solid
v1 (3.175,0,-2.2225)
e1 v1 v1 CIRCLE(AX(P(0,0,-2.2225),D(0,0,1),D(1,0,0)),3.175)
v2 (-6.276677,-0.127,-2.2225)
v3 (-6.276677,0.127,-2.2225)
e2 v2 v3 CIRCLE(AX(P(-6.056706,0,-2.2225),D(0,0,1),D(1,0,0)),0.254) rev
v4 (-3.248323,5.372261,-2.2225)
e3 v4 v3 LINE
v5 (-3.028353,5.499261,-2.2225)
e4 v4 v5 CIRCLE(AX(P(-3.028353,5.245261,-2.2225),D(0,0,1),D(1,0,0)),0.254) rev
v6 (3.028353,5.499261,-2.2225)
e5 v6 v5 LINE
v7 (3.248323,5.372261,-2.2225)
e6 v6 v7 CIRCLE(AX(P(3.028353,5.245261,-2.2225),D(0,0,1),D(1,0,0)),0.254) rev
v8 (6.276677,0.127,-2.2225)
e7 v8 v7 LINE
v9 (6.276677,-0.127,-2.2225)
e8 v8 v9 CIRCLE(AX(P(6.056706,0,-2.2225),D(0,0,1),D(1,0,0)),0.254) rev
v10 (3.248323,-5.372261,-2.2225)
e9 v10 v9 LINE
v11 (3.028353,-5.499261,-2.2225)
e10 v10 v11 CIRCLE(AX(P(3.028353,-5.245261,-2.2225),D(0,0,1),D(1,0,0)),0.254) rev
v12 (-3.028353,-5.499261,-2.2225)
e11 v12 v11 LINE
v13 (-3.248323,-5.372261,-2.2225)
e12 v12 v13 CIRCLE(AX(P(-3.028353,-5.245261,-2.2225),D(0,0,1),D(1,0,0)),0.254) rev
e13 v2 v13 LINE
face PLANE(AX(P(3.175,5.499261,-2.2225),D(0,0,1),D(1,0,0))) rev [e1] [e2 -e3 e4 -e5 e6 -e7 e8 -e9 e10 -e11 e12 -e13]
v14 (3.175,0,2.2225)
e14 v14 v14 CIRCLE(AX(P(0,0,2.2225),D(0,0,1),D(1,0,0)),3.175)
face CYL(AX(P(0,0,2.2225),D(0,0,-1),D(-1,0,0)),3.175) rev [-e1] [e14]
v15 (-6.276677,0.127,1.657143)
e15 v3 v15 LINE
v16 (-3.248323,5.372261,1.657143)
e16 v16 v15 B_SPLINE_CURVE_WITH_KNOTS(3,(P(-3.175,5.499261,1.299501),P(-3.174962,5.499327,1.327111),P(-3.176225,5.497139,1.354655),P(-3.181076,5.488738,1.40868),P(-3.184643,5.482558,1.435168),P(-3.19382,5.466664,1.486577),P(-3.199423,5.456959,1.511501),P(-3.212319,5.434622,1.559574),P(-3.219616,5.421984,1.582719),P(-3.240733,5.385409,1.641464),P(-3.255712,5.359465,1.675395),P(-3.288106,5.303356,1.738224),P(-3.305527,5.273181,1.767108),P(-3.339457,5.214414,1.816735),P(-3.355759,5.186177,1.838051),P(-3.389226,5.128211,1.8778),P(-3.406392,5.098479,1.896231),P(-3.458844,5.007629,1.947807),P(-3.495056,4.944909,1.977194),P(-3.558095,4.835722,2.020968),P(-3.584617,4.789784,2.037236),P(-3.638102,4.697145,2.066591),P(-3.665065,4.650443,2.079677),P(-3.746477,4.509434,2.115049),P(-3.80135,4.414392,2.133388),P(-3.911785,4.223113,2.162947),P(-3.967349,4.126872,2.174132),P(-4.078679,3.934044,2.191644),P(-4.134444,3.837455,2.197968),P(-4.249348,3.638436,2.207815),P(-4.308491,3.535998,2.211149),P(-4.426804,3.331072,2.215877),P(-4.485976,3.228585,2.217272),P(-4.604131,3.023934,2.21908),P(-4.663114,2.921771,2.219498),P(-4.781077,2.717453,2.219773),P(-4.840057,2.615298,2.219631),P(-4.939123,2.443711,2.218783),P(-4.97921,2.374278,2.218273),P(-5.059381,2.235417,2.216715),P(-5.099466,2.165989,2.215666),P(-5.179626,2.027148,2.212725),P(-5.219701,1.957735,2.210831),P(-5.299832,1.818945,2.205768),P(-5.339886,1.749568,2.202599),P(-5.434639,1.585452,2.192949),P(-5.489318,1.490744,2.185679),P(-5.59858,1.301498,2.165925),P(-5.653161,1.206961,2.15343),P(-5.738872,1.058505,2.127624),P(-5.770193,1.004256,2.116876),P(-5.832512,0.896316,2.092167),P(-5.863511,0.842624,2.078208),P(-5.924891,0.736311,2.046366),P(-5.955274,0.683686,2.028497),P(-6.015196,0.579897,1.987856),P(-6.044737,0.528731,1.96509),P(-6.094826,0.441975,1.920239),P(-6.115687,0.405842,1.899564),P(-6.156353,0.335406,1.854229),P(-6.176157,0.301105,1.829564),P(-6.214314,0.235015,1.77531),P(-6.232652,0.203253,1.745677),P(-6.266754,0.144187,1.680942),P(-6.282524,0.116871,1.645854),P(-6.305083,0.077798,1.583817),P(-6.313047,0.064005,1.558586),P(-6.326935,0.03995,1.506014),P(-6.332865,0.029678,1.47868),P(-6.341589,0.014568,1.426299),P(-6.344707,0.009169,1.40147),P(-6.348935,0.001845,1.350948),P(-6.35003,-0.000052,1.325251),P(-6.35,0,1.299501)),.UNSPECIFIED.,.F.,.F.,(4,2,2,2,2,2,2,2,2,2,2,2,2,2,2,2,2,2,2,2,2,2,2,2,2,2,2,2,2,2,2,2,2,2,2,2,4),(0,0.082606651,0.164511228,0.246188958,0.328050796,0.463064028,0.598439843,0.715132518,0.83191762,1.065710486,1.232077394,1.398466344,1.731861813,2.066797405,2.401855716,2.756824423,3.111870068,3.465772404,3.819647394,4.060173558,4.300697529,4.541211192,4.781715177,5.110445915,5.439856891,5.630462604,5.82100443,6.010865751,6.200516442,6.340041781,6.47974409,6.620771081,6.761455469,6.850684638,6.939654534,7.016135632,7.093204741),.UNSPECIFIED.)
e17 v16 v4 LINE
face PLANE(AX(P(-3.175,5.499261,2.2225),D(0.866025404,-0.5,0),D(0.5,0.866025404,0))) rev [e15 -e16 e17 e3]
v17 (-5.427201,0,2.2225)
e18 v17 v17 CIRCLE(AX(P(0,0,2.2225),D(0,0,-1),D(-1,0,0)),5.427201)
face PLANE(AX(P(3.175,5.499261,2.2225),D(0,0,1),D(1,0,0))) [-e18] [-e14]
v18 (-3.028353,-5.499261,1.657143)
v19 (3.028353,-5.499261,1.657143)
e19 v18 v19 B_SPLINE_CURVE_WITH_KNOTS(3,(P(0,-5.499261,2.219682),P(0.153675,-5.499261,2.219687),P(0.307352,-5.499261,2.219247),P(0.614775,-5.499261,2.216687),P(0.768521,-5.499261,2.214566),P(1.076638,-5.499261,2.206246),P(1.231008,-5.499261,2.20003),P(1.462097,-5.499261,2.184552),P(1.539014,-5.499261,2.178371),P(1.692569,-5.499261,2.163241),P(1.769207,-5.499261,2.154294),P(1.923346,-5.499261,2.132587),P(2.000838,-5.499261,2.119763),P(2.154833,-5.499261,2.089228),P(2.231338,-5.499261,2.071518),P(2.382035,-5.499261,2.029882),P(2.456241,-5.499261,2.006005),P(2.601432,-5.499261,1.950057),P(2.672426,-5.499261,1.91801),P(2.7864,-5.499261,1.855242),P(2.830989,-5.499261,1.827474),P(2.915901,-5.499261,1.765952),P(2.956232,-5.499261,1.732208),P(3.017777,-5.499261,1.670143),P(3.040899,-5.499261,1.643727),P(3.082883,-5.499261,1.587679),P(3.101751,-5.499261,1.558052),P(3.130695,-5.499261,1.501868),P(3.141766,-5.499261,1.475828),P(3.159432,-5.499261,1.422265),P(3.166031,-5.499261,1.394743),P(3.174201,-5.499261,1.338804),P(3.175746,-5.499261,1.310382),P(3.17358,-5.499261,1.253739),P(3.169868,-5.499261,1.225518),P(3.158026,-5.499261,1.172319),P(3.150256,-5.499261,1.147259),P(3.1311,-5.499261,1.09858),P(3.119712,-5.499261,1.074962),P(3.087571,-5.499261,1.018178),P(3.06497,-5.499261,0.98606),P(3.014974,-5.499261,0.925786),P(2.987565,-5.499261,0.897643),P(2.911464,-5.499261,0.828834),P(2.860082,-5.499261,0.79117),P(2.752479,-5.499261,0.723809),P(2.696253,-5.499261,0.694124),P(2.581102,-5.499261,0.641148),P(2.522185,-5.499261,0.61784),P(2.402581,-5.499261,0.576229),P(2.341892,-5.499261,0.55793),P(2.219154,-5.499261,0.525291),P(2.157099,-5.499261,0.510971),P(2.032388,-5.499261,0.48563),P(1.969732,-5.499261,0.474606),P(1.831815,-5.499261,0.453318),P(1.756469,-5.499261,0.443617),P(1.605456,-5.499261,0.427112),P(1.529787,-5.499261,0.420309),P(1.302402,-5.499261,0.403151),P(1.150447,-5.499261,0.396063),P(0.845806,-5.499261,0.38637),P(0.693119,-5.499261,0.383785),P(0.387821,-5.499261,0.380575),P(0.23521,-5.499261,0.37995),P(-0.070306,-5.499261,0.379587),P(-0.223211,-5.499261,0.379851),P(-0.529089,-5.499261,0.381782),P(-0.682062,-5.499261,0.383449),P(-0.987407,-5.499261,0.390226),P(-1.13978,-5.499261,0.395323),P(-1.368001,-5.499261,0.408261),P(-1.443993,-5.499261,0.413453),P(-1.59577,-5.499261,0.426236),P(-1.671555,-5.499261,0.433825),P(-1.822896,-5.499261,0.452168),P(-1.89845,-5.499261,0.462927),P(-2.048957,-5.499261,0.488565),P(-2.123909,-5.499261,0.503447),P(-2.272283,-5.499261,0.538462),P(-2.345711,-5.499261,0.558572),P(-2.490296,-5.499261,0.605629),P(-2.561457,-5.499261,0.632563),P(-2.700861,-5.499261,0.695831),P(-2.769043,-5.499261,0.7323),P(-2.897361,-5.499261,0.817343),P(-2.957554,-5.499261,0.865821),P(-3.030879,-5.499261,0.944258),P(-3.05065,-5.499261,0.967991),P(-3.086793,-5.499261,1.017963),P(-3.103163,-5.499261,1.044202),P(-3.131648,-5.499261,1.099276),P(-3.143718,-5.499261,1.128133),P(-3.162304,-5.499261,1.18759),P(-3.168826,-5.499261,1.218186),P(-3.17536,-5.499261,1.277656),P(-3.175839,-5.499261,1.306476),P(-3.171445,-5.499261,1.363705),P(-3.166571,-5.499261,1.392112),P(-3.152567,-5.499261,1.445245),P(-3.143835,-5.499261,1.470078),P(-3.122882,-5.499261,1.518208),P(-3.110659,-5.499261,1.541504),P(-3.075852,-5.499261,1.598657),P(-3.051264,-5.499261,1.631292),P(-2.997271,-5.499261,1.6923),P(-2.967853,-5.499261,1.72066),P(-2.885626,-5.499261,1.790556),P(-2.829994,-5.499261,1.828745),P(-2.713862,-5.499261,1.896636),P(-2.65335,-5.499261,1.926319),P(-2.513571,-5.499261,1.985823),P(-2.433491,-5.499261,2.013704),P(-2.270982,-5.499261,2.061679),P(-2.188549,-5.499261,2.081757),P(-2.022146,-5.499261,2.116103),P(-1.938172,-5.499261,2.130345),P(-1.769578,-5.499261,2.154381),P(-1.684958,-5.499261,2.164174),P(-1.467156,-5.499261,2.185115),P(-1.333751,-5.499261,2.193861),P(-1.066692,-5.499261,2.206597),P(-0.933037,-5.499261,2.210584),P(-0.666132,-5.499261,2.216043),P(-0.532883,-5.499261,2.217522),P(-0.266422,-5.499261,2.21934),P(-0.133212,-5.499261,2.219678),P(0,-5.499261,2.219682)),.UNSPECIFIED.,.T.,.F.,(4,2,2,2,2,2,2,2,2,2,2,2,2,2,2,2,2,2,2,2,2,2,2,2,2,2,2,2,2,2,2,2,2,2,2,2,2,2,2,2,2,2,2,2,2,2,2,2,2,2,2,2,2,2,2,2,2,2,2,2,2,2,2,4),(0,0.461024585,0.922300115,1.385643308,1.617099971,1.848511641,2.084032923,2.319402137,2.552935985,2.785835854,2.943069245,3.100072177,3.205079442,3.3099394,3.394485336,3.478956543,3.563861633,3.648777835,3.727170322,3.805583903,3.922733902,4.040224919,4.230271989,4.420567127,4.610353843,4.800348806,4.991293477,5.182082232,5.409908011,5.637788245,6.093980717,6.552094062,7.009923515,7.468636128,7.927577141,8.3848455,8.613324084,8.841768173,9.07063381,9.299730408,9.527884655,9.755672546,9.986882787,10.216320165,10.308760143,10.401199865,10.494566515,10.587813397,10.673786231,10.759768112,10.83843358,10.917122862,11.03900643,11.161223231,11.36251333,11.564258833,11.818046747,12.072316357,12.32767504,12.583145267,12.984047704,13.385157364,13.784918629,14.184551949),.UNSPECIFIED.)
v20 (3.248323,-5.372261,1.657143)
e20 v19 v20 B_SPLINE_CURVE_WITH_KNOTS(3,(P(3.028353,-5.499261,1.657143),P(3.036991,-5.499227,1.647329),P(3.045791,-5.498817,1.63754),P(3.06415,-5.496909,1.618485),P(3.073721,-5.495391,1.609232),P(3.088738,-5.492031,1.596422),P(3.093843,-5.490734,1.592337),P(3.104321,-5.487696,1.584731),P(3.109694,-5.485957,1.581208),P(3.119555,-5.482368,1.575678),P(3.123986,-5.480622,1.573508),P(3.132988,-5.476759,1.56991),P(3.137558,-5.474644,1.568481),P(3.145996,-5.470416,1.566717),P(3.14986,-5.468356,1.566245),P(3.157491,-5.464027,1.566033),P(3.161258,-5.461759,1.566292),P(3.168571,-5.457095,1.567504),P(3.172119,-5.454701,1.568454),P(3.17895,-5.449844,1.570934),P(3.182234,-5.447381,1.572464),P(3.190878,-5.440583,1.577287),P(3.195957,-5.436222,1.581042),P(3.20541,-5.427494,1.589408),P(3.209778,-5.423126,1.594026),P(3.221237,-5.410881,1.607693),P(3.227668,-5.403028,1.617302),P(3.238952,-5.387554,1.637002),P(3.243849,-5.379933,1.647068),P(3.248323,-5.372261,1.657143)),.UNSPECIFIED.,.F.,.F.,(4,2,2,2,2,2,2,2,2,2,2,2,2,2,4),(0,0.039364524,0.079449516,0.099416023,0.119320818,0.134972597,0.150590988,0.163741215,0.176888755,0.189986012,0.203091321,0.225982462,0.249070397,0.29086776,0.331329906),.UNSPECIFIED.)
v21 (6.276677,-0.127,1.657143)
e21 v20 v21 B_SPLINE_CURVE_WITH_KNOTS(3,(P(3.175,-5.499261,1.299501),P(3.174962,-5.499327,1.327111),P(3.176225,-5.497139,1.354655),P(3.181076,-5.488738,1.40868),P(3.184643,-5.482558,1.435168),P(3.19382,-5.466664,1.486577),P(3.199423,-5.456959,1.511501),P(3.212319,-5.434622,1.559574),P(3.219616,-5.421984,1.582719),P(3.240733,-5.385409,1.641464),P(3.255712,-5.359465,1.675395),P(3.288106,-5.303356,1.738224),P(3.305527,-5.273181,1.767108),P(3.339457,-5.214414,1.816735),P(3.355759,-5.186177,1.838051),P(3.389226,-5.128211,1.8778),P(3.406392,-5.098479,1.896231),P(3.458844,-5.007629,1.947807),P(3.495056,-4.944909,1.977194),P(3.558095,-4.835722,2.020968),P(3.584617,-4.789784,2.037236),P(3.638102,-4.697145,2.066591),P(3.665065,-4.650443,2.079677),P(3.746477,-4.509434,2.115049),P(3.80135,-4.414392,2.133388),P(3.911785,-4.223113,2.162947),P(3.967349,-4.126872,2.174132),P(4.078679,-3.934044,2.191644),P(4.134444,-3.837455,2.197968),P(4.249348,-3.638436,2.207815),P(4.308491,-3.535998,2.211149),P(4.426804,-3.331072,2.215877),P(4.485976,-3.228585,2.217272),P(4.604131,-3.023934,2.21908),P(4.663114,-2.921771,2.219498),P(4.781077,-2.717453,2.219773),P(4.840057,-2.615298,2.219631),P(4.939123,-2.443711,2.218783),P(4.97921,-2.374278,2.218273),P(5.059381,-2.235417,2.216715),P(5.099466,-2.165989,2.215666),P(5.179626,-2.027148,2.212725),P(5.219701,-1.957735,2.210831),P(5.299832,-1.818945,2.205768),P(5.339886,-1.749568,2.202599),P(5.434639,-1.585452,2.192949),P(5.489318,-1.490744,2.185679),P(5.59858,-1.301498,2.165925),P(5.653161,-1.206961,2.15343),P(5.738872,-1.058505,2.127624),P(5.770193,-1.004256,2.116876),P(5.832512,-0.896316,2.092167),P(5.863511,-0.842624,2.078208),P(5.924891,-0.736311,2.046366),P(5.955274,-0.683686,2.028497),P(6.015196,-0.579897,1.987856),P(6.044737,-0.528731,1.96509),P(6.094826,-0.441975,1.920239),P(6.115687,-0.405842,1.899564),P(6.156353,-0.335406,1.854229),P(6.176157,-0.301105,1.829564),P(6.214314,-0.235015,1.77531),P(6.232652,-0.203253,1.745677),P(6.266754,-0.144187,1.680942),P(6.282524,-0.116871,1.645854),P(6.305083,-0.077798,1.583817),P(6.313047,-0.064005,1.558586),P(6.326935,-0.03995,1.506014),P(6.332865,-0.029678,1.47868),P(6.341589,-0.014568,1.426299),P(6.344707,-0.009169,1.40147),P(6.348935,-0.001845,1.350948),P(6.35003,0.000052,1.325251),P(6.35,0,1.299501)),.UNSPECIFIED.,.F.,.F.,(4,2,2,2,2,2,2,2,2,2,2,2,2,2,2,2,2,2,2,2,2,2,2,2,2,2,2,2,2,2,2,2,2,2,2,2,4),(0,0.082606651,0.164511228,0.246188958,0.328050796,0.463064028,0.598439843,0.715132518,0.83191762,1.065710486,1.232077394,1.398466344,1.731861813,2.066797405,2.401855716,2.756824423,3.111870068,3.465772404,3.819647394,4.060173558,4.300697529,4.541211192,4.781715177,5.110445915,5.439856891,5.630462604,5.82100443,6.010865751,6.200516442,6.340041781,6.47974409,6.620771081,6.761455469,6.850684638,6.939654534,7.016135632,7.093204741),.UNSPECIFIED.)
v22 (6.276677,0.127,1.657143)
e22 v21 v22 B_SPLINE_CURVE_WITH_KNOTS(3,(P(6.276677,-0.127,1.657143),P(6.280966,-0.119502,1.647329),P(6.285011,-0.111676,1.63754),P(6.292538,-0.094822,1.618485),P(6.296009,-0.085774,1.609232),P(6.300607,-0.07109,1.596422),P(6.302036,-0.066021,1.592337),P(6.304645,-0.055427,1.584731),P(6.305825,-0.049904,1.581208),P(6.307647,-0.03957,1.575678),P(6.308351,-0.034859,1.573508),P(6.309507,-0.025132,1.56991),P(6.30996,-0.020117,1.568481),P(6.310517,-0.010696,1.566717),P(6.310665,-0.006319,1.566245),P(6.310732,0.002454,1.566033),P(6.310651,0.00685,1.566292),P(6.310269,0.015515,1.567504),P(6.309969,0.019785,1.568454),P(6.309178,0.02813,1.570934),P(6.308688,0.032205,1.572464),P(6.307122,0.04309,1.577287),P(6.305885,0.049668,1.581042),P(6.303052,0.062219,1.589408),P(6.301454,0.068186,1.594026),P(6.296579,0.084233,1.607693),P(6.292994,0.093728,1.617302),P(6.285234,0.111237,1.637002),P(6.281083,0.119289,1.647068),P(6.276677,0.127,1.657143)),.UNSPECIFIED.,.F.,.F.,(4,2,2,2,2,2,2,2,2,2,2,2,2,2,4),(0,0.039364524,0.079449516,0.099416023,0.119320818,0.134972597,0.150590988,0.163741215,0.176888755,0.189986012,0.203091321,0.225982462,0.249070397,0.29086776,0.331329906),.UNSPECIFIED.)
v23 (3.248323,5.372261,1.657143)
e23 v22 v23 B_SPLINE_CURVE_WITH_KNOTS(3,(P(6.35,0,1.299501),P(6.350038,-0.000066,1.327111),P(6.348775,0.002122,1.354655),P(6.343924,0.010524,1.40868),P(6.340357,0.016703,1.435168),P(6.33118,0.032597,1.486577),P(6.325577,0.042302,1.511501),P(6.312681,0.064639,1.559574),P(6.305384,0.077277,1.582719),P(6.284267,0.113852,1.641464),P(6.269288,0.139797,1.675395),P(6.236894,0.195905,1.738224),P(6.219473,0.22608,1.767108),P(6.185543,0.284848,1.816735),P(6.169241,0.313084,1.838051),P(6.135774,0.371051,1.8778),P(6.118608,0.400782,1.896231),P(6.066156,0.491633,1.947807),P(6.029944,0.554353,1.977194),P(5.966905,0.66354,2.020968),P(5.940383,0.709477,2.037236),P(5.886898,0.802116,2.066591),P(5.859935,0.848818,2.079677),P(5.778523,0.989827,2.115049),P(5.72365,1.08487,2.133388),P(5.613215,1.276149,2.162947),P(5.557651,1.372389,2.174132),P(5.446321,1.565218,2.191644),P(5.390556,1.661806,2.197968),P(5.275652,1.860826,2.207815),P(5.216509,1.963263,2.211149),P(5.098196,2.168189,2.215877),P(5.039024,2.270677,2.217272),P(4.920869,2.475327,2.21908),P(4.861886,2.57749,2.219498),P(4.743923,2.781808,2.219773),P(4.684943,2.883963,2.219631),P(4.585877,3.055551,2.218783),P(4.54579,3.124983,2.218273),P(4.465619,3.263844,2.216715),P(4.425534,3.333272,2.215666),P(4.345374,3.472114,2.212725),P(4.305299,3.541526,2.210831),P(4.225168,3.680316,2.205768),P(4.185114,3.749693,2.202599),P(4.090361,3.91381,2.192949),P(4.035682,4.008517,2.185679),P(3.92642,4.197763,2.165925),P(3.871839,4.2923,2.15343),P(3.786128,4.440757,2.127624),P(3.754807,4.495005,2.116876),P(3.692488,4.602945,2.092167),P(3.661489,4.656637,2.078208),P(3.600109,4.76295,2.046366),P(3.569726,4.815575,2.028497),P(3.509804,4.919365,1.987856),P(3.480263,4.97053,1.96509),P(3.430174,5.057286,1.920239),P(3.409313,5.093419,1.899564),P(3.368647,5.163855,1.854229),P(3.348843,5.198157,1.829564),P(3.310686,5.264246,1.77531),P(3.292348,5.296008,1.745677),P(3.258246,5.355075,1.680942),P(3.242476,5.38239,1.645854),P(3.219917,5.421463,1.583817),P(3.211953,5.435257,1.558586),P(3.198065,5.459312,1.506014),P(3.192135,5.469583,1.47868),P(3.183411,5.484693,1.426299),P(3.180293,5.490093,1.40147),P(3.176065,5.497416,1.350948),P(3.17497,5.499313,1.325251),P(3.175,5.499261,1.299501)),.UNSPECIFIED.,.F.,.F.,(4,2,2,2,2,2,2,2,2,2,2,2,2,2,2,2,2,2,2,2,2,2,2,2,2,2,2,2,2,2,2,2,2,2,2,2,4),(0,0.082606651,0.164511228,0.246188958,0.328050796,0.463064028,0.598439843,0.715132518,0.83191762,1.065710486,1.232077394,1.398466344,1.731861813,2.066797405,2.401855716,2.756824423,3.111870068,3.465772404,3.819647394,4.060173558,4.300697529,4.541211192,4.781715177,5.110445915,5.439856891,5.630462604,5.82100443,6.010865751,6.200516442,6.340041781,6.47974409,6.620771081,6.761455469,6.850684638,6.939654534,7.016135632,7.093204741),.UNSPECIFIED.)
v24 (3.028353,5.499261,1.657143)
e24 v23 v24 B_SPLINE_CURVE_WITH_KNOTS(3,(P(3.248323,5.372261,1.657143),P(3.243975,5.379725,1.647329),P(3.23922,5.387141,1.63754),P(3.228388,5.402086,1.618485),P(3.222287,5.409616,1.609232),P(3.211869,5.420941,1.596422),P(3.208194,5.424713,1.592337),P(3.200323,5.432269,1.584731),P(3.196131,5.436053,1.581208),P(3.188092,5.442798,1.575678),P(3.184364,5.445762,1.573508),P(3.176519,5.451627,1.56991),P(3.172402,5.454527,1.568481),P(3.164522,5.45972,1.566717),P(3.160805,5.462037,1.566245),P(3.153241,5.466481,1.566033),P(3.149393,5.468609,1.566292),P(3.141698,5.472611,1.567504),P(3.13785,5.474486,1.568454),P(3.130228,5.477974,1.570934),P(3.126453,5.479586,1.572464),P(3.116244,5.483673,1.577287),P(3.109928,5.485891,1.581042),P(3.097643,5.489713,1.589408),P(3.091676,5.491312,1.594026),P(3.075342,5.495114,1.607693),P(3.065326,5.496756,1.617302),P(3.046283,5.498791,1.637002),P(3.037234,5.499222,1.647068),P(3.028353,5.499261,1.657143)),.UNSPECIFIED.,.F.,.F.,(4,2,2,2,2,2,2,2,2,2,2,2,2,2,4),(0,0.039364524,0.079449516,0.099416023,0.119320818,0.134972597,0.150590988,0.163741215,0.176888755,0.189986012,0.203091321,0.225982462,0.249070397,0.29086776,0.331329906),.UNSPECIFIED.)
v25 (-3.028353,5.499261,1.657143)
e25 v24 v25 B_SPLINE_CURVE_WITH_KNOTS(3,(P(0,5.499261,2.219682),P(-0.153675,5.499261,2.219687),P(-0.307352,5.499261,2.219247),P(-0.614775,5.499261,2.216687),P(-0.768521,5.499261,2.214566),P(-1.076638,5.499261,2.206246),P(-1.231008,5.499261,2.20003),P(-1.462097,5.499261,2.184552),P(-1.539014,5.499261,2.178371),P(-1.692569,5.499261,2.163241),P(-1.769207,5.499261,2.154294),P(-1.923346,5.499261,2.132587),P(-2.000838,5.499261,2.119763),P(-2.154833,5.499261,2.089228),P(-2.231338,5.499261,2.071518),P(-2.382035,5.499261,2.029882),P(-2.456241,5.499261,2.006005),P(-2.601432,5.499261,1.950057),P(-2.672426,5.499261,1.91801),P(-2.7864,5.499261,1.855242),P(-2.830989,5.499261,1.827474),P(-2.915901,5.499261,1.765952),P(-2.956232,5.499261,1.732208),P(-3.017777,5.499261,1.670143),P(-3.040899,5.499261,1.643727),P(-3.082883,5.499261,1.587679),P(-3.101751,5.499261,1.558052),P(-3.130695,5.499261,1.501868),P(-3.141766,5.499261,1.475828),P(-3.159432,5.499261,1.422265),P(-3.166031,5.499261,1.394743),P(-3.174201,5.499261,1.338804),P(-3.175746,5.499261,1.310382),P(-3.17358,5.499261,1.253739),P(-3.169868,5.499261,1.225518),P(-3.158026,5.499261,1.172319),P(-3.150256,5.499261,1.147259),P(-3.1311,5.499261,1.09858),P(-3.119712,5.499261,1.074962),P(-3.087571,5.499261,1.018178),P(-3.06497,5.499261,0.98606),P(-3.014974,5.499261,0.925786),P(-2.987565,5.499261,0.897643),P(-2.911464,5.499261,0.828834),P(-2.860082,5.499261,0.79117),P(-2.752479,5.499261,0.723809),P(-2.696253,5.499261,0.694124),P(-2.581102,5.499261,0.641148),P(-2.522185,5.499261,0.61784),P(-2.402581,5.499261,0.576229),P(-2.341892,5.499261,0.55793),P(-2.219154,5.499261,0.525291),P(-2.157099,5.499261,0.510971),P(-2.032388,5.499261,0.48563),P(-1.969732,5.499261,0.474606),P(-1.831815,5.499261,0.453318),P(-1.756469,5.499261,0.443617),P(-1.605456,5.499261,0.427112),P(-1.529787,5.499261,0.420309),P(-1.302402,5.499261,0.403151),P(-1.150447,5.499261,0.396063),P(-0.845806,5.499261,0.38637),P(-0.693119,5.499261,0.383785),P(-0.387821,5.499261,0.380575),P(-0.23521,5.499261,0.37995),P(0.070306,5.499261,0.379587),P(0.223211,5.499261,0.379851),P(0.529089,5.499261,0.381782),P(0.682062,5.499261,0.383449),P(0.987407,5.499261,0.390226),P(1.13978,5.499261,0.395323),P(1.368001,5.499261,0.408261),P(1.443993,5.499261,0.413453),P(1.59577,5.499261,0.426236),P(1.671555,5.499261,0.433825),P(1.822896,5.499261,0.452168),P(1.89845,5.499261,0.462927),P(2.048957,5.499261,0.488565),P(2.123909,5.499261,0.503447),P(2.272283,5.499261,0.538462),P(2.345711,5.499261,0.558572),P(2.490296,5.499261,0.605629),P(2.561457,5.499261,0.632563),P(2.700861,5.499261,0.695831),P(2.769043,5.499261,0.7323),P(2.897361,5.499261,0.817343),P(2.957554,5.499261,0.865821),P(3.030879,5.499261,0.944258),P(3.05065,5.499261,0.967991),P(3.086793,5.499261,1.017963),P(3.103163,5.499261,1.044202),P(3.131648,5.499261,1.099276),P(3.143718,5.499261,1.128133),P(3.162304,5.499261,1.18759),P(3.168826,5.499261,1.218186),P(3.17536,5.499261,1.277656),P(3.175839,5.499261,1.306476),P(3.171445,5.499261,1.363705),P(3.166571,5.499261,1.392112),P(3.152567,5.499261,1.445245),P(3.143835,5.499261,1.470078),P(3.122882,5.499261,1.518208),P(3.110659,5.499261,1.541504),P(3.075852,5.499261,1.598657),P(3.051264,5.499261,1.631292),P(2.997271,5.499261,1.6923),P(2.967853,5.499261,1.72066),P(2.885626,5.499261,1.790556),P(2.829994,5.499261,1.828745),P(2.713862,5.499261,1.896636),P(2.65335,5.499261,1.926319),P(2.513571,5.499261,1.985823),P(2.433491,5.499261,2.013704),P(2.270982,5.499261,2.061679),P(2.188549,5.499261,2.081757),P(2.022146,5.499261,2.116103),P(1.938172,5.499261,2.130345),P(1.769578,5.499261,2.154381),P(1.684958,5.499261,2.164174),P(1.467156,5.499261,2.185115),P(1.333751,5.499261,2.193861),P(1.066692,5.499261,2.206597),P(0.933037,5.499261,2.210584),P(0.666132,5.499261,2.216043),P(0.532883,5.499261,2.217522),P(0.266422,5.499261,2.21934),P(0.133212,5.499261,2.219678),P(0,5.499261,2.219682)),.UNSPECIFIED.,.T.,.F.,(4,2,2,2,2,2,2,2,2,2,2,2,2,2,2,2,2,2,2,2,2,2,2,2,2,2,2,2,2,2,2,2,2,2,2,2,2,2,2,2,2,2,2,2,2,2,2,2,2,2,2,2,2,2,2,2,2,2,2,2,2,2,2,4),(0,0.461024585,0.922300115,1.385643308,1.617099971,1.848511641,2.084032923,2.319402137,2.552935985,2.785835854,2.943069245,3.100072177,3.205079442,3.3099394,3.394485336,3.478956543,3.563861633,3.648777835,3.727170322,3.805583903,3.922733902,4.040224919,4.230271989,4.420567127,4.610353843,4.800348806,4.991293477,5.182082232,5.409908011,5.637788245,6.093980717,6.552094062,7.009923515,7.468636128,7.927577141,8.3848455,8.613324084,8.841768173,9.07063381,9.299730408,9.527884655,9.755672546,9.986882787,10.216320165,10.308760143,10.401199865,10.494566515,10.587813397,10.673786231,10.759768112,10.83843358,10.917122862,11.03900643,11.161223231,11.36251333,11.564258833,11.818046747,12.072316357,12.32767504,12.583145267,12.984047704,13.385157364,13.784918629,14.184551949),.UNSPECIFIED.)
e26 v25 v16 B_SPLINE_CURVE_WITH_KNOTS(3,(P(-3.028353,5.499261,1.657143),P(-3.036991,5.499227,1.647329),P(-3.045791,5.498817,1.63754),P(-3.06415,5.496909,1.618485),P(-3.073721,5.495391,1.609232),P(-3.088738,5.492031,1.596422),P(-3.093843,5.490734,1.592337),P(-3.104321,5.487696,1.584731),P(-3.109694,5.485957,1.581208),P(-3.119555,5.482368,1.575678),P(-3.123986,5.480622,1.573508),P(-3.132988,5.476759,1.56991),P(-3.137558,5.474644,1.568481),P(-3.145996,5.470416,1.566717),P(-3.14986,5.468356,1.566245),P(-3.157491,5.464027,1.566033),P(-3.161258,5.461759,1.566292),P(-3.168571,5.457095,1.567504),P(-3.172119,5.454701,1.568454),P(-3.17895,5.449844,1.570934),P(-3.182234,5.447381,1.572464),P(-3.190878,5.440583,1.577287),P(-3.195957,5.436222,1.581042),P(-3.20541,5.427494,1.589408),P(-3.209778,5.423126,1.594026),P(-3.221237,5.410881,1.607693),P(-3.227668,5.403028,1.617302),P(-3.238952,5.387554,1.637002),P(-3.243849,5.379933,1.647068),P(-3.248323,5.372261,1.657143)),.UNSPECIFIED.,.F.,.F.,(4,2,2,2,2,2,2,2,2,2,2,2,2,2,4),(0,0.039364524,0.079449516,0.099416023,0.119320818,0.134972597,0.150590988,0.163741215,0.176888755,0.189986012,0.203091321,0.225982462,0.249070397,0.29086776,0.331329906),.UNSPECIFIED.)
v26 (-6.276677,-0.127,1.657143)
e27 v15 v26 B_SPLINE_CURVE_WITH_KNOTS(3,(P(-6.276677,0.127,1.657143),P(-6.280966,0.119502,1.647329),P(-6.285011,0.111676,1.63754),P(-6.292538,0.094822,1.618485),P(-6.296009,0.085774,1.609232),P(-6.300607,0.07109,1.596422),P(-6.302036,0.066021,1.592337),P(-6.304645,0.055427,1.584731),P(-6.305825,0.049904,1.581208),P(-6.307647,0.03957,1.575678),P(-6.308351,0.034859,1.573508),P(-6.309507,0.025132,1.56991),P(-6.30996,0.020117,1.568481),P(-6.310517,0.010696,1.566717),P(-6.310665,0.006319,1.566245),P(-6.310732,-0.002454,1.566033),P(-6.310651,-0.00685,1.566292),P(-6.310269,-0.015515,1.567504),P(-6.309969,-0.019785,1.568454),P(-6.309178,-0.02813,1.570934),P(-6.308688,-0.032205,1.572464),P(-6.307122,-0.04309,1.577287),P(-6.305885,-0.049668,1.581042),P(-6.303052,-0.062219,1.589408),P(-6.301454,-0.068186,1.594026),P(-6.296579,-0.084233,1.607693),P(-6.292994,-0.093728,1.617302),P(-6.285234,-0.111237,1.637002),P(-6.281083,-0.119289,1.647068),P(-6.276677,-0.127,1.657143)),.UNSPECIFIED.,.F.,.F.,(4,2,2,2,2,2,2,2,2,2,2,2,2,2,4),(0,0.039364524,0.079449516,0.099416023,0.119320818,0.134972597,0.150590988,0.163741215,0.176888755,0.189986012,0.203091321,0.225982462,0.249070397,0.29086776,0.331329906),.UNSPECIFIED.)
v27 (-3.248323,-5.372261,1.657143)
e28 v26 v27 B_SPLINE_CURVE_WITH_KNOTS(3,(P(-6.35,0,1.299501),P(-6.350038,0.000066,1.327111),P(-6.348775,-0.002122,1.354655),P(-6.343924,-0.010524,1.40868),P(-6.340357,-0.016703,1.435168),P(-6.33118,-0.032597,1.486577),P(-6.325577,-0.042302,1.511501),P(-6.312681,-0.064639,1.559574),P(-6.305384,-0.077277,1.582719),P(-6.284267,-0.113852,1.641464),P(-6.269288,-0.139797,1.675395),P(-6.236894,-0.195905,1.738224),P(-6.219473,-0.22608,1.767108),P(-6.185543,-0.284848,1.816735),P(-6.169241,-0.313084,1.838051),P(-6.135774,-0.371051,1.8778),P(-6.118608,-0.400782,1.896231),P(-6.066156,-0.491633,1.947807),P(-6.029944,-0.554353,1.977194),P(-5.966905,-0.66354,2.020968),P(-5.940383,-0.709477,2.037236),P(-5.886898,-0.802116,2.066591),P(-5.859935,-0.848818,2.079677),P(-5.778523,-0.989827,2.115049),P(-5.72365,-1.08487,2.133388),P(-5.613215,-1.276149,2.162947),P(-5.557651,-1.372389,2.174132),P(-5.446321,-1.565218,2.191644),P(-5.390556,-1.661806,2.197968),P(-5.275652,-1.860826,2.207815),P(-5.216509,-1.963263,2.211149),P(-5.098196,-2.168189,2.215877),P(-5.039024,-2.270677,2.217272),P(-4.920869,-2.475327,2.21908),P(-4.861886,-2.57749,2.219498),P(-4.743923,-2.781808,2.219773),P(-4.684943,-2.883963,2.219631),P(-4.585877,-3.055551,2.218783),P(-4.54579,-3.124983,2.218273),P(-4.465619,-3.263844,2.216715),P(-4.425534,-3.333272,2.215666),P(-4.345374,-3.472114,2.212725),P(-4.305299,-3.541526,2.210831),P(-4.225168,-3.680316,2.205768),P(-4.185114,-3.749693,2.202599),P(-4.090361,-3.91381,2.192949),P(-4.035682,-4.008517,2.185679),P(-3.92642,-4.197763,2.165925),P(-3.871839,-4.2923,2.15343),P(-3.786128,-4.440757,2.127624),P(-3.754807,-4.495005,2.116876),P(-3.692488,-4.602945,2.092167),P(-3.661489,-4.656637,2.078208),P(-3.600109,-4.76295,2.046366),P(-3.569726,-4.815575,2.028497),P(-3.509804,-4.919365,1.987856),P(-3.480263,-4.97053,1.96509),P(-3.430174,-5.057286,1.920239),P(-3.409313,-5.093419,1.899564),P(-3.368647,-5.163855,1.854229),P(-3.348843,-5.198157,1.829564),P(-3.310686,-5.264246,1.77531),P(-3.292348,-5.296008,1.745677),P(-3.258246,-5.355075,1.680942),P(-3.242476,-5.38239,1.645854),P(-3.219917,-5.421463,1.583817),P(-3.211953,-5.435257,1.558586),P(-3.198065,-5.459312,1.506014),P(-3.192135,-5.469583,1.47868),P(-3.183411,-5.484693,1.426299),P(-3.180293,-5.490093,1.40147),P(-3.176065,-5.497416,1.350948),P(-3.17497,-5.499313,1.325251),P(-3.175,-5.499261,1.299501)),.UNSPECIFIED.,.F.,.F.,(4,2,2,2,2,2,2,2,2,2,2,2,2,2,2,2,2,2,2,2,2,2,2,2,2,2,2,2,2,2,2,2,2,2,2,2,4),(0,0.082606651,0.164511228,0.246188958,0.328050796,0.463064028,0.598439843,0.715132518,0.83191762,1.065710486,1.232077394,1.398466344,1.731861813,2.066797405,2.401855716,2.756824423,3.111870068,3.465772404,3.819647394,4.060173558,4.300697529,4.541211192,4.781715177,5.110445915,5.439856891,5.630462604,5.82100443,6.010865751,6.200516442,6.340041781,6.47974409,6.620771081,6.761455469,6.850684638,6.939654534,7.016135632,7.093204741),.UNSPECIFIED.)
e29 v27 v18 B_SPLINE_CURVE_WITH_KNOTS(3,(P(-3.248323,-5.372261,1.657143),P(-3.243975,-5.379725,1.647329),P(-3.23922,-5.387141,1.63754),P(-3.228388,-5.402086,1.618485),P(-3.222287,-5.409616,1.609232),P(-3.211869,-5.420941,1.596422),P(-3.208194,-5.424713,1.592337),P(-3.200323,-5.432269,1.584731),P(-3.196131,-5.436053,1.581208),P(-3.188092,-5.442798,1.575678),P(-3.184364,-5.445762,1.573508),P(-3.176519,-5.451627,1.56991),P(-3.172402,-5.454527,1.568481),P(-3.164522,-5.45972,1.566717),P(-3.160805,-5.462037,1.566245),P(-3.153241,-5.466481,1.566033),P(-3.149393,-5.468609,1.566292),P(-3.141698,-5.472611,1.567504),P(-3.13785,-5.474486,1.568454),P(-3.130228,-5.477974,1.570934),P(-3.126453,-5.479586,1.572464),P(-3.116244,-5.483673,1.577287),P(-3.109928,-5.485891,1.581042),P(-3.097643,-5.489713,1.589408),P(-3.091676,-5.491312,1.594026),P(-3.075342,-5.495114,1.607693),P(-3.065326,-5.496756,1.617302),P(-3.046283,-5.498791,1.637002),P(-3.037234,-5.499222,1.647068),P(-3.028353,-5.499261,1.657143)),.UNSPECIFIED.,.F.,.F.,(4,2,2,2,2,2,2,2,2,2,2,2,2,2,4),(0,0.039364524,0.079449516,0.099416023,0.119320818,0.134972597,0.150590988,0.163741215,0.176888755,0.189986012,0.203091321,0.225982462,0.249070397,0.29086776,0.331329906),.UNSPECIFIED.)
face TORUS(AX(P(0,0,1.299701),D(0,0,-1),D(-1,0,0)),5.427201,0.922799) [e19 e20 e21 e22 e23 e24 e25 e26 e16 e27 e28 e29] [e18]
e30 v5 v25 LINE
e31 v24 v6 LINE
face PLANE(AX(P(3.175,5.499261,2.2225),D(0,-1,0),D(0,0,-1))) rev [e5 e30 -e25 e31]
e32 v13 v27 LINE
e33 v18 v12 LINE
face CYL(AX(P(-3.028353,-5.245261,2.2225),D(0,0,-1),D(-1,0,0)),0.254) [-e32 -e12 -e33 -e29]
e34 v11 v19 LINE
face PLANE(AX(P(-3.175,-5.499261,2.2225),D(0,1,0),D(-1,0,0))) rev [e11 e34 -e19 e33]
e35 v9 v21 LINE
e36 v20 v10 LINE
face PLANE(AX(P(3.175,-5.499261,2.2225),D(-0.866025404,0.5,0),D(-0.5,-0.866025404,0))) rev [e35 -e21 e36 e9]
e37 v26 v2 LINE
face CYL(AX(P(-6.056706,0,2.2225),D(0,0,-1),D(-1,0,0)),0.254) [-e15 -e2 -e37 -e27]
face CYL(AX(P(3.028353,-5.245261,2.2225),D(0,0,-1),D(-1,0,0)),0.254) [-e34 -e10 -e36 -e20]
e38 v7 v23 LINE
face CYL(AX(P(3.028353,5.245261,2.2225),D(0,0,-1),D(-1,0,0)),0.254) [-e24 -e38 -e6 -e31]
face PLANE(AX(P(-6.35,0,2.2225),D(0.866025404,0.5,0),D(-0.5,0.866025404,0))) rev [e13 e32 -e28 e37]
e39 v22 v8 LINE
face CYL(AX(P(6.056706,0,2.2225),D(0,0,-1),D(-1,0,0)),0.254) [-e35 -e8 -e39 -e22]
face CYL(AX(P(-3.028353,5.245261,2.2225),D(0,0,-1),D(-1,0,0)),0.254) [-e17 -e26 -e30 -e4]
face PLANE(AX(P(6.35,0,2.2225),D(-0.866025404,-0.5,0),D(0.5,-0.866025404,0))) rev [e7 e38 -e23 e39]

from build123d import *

# Parameters (mm, degrees)
SKETCH1_R      = 3.175
EXTRUDE1_DEPTH = 2.2225
FILLET2_R      = 0.254


with BuildPart() as part:
    # Sketch1 → Extrude1 (new, symmetric)
    with BuildSketch(Plane.XY):
        Polygon((3.175, 5.499261314), (-3.175, 5.499261314), (-6.35, 0), (-3.175, -5.499261314), (3.175, -5.499261314), (6.35, 0), align=None)
        Circle(SKETCH1_R, mode=Mode.SUBTRACT)
    extrude(amount=EXTRUDE1_DEPTH, both=True)

    # Sketch7 → Cut-Revolve2 (revolve, cut)
    with BuildSketch(Plane(origin=(0, 0, 0), x_dir=(1, 0, 0), z_dir=(0, 1, 0)), mode=Mode.PRIVATE) as cut_revolve2_sk:
        with BuildLine():
            Line((5.310988996, -2.2225), (5.427200903, -2.2225))
            ThreePointArc((5.427200903, -2.2225), (6.079718402, -1.952218402), (6.35, -1.299700903))
            Line((6.35, -1.299700903), (6.71065175, -1.932108982))
            ThreePointArc((6.71065175, -1.932108982), (6.182957857, -2.514615502), (5.427200903, -2.7305))
            Line((5.427200903, -2.7305), (5.310988996, -2.7305))
            Line((5.310988996, -2.7305), (5.310988996, -2.2225))
        make_face()
    revolve(cut_revolve2_sk.sketch.rotate(Axis((0, 0, -4.413769038), (0, 0, 1)), 180), axis=Axis((0, 0, -4.413769038), (0, 0, 1)), mode=Mode.SUBTRACT)

    # Fillet2
    # the kernel refuses this fillet: 0.254 mm, written as the material it takes off along each edge
    with BuildSketch(Plane(origin=(-3.175, 5.499261314, -2.589117421), x_dir=(1, 0, 0), z_dir=(0, 0, 1)), Plane(origin=(3.175, 5.499261314, 1.666318324), x_dir=(-1, 0, 0), z_dir=(0, 0, -1)), Plane(origin=(6.35, 0, 1.666318324), x_dir=(-0.5000000000000007, 0.8660254037844384, 0), z_dir=(0, 0, -1)), Plane(origin=(3.175, -5.499261314, 1.666318324), x_dir=(0.49999999999999906, 0.8660254037844392, 0), z_dir=(0, 0, -1)), Plane(origin=(-3.175, -5.499261314, -2.589117421), x_dir=(-0.4999999999999997, 0.8660254037844387, 0), z_dir=(0, 0, 1)), Plane(origin=(-6.35, 0, -2.589117421), x_dir=(0.4999999999999968, 0.8660254037844406, 0), z_dir=(0, 0, 1))) as fillet2_piece_1:
        with BuildLine():
            CenterArc((FILLET2_R * 0.57735026919, -FILLET2_R), FILLET2_R, 90, 60)
            Line((-FILLET2_R * 0.288675134595, -FILLET2_R * 0.5), (0, 0))
            Line((0, 0), (FILLET2_R * 0.57735026919, 0))
        make_face()
    extrude(amount=4.255435745, mode=Mode.SUBTRACT)


solid = part.part
